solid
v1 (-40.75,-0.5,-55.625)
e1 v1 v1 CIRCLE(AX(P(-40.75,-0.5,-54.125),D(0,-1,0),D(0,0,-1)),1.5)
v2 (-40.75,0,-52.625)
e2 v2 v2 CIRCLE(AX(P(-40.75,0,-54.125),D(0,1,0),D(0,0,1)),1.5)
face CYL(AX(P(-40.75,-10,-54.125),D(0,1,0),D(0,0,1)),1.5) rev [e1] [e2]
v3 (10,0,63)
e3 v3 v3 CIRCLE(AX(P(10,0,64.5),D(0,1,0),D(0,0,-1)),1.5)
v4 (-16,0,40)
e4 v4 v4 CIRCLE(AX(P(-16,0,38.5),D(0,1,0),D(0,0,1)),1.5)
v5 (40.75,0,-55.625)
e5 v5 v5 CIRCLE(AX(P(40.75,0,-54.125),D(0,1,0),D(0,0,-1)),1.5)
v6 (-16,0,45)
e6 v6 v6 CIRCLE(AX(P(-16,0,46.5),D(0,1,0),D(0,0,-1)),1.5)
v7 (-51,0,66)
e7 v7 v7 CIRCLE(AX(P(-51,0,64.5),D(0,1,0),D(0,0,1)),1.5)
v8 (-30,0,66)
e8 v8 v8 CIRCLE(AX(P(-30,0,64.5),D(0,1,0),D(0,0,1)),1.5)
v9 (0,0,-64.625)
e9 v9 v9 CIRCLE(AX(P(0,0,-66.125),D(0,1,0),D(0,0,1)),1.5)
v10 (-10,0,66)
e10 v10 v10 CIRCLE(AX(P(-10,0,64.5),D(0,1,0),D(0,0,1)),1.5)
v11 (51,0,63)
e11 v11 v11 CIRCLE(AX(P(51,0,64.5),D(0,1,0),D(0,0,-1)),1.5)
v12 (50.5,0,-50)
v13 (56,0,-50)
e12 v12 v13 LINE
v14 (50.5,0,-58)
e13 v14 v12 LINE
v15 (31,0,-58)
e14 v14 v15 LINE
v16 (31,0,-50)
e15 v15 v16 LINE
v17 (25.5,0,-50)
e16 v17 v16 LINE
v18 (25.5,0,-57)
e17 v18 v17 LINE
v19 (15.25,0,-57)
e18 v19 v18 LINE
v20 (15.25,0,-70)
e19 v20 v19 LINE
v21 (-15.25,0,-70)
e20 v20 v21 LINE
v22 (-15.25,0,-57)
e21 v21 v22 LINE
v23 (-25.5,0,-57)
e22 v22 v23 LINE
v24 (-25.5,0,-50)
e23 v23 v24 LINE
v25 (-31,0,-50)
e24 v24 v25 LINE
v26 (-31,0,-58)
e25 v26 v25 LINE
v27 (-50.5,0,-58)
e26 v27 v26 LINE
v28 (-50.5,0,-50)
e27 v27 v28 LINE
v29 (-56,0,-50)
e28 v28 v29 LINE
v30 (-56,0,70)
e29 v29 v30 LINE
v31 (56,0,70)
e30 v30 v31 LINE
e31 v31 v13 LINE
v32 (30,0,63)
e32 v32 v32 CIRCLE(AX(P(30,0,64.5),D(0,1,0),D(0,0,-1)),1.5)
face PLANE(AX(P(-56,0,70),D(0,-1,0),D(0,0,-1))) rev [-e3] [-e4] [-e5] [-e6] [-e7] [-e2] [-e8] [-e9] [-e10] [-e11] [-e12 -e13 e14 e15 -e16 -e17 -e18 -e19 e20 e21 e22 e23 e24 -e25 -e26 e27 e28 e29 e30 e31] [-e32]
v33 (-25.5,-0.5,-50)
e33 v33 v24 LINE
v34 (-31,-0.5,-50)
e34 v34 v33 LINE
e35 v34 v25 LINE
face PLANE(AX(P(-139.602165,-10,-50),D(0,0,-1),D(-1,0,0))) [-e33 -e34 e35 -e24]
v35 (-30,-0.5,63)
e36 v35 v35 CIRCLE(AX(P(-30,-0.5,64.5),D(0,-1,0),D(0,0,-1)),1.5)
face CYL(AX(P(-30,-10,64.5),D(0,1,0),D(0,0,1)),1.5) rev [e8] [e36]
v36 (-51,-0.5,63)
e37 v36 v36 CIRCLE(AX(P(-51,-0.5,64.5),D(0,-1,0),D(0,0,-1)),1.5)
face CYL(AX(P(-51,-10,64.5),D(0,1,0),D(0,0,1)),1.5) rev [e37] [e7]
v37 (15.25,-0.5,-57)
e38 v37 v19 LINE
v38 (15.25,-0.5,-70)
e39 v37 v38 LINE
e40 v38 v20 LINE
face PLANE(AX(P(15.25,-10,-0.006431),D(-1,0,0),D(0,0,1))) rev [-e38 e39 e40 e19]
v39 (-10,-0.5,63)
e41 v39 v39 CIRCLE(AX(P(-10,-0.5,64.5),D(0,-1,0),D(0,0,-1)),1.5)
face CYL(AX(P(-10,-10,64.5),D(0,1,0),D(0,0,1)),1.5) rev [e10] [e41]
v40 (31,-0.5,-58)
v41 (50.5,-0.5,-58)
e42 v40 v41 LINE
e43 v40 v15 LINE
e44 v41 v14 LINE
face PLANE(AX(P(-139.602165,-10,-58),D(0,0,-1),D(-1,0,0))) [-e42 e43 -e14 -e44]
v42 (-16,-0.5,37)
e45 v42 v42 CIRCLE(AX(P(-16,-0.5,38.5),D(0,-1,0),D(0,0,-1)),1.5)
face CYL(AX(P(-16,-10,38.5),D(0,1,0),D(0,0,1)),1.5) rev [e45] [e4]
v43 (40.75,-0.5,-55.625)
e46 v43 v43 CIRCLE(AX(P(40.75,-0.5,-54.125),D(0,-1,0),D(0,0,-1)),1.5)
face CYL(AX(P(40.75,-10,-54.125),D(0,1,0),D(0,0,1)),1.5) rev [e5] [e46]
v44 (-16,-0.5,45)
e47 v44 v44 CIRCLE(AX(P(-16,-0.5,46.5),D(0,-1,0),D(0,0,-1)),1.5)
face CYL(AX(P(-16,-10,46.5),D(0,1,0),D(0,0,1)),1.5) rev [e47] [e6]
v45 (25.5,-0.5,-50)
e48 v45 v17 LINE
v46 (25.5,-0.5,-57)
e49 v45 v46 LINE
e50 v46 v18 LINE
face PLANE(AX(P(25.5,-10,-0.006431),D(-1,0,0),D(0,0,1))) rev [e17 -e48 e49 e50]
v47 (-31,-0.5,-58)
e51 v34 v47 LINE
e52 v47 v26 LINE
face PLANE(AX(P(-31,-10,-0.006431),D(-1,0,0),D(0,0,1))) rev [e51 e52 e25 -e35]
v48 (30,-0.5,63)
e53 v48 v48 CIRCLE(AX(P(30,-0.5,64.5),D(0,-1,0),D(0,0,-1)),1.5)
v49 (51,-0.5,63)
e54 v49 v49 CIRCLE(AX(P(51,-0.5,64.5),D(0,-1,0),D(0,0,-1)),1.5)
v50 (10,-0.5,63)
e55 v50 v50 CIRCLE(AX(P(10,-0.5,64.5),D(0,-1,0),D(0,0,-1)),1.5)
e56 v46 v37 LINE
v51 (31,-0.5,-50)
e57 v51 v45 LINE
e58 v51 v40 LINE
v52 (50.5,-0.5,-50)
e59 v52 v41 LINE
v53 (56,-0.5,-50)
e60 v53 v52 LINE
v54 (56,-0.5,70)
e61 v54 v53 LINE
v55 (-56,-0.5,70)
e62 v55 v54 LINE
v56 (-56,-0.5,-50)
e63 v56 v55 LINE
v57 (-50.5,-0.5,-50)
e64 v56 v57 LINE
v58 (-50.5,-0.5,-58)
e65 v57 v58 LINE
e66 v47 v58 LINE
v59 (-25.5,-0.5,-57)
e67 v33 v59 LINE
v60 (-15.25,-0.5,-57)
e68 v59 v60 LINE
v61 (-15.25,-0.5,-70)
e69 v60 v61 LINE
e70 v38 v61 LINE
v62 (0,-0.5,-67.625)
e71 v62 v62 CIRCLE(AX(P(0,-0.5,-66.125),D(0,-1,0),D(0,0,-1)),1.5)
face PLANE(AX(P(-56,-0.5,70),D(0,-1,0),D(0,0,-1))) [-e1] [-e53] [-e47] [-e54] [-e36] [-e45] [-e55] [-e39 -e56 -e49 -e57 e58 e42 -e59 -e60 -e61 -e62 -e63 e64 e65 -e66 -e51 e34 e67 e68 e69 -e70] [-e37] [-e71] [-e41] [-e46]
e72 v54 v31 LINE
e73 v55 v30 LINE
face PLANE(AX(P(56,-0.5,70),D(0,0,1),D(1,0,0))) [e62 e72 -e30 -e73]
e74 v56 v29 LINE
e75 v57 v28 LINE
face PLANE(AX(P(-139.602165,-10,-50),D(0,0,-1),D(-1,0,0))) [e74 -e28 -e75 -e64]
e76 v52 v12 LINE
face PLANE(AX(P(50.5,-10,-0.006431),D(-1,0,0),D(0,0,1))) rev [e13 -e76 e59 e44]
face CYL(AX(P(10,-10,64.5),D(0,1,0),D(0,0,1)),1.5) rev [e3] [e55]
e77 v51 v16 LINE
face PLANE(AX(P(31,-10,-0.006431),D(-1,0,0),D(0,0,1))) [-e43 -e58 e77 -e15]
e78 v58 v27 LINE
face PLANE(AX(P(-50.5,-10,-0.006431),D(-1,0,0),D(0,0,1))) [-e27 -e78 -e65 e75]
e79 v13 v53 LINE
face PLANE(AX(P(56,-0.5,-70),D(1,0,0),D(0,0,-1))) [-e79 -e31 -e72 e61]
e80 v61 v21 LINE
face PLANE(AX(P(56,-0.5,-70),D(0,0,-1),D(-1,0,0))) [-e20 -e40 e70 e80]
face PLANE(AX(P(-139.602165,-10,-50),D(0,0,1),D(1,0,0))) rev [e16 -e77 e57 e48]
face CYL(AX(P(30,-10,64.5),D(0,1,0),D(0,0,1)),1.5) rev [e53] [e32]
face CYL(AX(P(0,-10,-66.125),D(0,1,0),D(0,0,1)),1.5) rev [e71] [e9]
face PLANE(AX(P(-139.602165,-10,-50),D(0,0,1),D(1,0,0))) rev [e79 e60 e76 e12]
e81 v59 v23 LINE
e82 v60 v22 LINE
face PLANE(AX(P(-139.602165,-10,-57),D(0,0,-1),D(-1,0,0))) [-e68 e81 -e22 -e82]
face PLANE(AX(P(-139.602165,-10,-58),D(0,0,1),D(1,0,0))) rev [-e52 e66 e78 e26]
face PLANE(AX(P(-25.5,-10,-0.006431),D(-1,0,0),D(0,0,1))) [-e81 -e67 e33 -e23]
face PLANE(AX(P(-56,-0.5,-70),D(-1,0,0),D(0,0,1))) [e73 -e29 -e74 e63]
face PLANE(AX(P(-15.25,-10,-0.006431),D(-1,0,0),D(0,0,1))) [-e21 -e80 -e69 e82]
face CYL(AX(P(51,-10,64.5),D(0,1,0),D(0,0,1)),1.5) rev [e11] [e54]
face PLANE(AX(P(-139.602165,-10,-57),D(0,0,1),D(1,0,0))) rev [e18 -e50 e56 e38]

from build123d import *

# Parameters (mm, degrees)
CROQUIS1_W            = 112
CROQUIS1_H            = 140
BRIDA_BASE1_DEPTH     = 0.5
CORTAR_EXTRUIR1_DEPTH = 10
CROQUIS6_R            = 1.5
CORTAR_EXTRUIR2_DEPTH = 10
CROQUIS7_R            = 1.5
CORTAR_EXTRUIR3_DEPTH = 10


# Sheet-metal steps are written as plain solids
with BuildPart() as part:
    # Croquis1 → Brida base1 (new body)
    with BuildSketch(Plane(origin=(0, 0, 0), x_dir=(1, 0, 0), z_dir=(0, 1, 0))):
        Rectangle(CROQUIS1_W, CROQUIS1_H)
    extrude(amount=-BRIDA_BASE1_DEPTH)

    # Croquis5 → Cortar-Extruir1 (cut)
    with BuildSketch(Plane(origin=(0, 0, 0), x_dir=(1, 0, 0), z_dir=(0, 1, 0))):
        Polygon((-15.25, 57), (-15.25, 70), (-56, 70), (-56, 50), (-50.5, 50), (-50.5, 58), (-31, 58), (-31, 50), (-25.5, 50), (-25.5, 57), align=None)
        Polygon((56, 70), (15.25, 70), (15.25, 57), (25.5, 57), (25.5, 50), (31, 50), (31, 58), (50.5, 58), (50.5, 50), (56, 50), align=None)
    extrude(amount=-CORTAR_EXTRUIR1_DEPTH, mode=Mode.SUBTRACT)

    # Croquis6 → Cortar-Extruir2 (cut)
    with BuildSketch(Plane(origin=(0, 0, 0), x_dir=(1, 0, 0), z_dir=(0, 1, 0))):
        with Locations(Location((-40.75, 54.125, 0), (0, 0, 270))):
            Circle(CROQUIS6_R)
        with Locations(Location((0, 66.125, 0), (0, 0, 270))):
            Circle(CROQUIS6_R)
        with Locations(Location((40.75, 54.125, 0), (0, 0, 90))):
            Circle(CROQUIS6_R)
    extrude(amount=-CORTAR_EXTRUIR2_DEPTH, mode=Mode.SUBTRACT)

    # Croquis7 → Cortar-Extruir3 (cut)
    with BuildSketch(Plane(origin=(0, 0, 0), x_dir=(1, 0, 0), z_dir=(0, 1, 0))):
        with Locations(Location((-16, -38.5, 0), (0, 0, 270))):
            Circle(CROQUIS7_R)
        with Locations(Location((-16, -46.5, 0), (0, 0, 90))):
            Circle(CROQUIS7_R)
        with Locations(Location((-10, -64.5, 0), (0, 0, 270))):
            Circle(CROQUIS7_R)
        with Locations(Location((-30, -64.5, 0), (0, 0, 270))):
            Circle(CROQUIS7_R)
        with Locations(Location((30, -64.5, 0), (0, 0, 90))):
            Circle(CROQUIS7_R)
        with Locations(Location((10, -64.5, 0), (0, 0, 90))):
            Circle(CROQUIS7_R)
        with Locations(Location((-51, -64.5, 0), (0, 0, 270))):
            Circle(CROQUIS7_R)
        with Locations(Location((51, -64.5, 0), (0, 0, 90))):
            Circle(CROQUIS7_R)
    extrude(amount=-CORTAR_EXTRUIR3_DEPTH, mode=Mode.SUBTRACT)


solid = part.part
